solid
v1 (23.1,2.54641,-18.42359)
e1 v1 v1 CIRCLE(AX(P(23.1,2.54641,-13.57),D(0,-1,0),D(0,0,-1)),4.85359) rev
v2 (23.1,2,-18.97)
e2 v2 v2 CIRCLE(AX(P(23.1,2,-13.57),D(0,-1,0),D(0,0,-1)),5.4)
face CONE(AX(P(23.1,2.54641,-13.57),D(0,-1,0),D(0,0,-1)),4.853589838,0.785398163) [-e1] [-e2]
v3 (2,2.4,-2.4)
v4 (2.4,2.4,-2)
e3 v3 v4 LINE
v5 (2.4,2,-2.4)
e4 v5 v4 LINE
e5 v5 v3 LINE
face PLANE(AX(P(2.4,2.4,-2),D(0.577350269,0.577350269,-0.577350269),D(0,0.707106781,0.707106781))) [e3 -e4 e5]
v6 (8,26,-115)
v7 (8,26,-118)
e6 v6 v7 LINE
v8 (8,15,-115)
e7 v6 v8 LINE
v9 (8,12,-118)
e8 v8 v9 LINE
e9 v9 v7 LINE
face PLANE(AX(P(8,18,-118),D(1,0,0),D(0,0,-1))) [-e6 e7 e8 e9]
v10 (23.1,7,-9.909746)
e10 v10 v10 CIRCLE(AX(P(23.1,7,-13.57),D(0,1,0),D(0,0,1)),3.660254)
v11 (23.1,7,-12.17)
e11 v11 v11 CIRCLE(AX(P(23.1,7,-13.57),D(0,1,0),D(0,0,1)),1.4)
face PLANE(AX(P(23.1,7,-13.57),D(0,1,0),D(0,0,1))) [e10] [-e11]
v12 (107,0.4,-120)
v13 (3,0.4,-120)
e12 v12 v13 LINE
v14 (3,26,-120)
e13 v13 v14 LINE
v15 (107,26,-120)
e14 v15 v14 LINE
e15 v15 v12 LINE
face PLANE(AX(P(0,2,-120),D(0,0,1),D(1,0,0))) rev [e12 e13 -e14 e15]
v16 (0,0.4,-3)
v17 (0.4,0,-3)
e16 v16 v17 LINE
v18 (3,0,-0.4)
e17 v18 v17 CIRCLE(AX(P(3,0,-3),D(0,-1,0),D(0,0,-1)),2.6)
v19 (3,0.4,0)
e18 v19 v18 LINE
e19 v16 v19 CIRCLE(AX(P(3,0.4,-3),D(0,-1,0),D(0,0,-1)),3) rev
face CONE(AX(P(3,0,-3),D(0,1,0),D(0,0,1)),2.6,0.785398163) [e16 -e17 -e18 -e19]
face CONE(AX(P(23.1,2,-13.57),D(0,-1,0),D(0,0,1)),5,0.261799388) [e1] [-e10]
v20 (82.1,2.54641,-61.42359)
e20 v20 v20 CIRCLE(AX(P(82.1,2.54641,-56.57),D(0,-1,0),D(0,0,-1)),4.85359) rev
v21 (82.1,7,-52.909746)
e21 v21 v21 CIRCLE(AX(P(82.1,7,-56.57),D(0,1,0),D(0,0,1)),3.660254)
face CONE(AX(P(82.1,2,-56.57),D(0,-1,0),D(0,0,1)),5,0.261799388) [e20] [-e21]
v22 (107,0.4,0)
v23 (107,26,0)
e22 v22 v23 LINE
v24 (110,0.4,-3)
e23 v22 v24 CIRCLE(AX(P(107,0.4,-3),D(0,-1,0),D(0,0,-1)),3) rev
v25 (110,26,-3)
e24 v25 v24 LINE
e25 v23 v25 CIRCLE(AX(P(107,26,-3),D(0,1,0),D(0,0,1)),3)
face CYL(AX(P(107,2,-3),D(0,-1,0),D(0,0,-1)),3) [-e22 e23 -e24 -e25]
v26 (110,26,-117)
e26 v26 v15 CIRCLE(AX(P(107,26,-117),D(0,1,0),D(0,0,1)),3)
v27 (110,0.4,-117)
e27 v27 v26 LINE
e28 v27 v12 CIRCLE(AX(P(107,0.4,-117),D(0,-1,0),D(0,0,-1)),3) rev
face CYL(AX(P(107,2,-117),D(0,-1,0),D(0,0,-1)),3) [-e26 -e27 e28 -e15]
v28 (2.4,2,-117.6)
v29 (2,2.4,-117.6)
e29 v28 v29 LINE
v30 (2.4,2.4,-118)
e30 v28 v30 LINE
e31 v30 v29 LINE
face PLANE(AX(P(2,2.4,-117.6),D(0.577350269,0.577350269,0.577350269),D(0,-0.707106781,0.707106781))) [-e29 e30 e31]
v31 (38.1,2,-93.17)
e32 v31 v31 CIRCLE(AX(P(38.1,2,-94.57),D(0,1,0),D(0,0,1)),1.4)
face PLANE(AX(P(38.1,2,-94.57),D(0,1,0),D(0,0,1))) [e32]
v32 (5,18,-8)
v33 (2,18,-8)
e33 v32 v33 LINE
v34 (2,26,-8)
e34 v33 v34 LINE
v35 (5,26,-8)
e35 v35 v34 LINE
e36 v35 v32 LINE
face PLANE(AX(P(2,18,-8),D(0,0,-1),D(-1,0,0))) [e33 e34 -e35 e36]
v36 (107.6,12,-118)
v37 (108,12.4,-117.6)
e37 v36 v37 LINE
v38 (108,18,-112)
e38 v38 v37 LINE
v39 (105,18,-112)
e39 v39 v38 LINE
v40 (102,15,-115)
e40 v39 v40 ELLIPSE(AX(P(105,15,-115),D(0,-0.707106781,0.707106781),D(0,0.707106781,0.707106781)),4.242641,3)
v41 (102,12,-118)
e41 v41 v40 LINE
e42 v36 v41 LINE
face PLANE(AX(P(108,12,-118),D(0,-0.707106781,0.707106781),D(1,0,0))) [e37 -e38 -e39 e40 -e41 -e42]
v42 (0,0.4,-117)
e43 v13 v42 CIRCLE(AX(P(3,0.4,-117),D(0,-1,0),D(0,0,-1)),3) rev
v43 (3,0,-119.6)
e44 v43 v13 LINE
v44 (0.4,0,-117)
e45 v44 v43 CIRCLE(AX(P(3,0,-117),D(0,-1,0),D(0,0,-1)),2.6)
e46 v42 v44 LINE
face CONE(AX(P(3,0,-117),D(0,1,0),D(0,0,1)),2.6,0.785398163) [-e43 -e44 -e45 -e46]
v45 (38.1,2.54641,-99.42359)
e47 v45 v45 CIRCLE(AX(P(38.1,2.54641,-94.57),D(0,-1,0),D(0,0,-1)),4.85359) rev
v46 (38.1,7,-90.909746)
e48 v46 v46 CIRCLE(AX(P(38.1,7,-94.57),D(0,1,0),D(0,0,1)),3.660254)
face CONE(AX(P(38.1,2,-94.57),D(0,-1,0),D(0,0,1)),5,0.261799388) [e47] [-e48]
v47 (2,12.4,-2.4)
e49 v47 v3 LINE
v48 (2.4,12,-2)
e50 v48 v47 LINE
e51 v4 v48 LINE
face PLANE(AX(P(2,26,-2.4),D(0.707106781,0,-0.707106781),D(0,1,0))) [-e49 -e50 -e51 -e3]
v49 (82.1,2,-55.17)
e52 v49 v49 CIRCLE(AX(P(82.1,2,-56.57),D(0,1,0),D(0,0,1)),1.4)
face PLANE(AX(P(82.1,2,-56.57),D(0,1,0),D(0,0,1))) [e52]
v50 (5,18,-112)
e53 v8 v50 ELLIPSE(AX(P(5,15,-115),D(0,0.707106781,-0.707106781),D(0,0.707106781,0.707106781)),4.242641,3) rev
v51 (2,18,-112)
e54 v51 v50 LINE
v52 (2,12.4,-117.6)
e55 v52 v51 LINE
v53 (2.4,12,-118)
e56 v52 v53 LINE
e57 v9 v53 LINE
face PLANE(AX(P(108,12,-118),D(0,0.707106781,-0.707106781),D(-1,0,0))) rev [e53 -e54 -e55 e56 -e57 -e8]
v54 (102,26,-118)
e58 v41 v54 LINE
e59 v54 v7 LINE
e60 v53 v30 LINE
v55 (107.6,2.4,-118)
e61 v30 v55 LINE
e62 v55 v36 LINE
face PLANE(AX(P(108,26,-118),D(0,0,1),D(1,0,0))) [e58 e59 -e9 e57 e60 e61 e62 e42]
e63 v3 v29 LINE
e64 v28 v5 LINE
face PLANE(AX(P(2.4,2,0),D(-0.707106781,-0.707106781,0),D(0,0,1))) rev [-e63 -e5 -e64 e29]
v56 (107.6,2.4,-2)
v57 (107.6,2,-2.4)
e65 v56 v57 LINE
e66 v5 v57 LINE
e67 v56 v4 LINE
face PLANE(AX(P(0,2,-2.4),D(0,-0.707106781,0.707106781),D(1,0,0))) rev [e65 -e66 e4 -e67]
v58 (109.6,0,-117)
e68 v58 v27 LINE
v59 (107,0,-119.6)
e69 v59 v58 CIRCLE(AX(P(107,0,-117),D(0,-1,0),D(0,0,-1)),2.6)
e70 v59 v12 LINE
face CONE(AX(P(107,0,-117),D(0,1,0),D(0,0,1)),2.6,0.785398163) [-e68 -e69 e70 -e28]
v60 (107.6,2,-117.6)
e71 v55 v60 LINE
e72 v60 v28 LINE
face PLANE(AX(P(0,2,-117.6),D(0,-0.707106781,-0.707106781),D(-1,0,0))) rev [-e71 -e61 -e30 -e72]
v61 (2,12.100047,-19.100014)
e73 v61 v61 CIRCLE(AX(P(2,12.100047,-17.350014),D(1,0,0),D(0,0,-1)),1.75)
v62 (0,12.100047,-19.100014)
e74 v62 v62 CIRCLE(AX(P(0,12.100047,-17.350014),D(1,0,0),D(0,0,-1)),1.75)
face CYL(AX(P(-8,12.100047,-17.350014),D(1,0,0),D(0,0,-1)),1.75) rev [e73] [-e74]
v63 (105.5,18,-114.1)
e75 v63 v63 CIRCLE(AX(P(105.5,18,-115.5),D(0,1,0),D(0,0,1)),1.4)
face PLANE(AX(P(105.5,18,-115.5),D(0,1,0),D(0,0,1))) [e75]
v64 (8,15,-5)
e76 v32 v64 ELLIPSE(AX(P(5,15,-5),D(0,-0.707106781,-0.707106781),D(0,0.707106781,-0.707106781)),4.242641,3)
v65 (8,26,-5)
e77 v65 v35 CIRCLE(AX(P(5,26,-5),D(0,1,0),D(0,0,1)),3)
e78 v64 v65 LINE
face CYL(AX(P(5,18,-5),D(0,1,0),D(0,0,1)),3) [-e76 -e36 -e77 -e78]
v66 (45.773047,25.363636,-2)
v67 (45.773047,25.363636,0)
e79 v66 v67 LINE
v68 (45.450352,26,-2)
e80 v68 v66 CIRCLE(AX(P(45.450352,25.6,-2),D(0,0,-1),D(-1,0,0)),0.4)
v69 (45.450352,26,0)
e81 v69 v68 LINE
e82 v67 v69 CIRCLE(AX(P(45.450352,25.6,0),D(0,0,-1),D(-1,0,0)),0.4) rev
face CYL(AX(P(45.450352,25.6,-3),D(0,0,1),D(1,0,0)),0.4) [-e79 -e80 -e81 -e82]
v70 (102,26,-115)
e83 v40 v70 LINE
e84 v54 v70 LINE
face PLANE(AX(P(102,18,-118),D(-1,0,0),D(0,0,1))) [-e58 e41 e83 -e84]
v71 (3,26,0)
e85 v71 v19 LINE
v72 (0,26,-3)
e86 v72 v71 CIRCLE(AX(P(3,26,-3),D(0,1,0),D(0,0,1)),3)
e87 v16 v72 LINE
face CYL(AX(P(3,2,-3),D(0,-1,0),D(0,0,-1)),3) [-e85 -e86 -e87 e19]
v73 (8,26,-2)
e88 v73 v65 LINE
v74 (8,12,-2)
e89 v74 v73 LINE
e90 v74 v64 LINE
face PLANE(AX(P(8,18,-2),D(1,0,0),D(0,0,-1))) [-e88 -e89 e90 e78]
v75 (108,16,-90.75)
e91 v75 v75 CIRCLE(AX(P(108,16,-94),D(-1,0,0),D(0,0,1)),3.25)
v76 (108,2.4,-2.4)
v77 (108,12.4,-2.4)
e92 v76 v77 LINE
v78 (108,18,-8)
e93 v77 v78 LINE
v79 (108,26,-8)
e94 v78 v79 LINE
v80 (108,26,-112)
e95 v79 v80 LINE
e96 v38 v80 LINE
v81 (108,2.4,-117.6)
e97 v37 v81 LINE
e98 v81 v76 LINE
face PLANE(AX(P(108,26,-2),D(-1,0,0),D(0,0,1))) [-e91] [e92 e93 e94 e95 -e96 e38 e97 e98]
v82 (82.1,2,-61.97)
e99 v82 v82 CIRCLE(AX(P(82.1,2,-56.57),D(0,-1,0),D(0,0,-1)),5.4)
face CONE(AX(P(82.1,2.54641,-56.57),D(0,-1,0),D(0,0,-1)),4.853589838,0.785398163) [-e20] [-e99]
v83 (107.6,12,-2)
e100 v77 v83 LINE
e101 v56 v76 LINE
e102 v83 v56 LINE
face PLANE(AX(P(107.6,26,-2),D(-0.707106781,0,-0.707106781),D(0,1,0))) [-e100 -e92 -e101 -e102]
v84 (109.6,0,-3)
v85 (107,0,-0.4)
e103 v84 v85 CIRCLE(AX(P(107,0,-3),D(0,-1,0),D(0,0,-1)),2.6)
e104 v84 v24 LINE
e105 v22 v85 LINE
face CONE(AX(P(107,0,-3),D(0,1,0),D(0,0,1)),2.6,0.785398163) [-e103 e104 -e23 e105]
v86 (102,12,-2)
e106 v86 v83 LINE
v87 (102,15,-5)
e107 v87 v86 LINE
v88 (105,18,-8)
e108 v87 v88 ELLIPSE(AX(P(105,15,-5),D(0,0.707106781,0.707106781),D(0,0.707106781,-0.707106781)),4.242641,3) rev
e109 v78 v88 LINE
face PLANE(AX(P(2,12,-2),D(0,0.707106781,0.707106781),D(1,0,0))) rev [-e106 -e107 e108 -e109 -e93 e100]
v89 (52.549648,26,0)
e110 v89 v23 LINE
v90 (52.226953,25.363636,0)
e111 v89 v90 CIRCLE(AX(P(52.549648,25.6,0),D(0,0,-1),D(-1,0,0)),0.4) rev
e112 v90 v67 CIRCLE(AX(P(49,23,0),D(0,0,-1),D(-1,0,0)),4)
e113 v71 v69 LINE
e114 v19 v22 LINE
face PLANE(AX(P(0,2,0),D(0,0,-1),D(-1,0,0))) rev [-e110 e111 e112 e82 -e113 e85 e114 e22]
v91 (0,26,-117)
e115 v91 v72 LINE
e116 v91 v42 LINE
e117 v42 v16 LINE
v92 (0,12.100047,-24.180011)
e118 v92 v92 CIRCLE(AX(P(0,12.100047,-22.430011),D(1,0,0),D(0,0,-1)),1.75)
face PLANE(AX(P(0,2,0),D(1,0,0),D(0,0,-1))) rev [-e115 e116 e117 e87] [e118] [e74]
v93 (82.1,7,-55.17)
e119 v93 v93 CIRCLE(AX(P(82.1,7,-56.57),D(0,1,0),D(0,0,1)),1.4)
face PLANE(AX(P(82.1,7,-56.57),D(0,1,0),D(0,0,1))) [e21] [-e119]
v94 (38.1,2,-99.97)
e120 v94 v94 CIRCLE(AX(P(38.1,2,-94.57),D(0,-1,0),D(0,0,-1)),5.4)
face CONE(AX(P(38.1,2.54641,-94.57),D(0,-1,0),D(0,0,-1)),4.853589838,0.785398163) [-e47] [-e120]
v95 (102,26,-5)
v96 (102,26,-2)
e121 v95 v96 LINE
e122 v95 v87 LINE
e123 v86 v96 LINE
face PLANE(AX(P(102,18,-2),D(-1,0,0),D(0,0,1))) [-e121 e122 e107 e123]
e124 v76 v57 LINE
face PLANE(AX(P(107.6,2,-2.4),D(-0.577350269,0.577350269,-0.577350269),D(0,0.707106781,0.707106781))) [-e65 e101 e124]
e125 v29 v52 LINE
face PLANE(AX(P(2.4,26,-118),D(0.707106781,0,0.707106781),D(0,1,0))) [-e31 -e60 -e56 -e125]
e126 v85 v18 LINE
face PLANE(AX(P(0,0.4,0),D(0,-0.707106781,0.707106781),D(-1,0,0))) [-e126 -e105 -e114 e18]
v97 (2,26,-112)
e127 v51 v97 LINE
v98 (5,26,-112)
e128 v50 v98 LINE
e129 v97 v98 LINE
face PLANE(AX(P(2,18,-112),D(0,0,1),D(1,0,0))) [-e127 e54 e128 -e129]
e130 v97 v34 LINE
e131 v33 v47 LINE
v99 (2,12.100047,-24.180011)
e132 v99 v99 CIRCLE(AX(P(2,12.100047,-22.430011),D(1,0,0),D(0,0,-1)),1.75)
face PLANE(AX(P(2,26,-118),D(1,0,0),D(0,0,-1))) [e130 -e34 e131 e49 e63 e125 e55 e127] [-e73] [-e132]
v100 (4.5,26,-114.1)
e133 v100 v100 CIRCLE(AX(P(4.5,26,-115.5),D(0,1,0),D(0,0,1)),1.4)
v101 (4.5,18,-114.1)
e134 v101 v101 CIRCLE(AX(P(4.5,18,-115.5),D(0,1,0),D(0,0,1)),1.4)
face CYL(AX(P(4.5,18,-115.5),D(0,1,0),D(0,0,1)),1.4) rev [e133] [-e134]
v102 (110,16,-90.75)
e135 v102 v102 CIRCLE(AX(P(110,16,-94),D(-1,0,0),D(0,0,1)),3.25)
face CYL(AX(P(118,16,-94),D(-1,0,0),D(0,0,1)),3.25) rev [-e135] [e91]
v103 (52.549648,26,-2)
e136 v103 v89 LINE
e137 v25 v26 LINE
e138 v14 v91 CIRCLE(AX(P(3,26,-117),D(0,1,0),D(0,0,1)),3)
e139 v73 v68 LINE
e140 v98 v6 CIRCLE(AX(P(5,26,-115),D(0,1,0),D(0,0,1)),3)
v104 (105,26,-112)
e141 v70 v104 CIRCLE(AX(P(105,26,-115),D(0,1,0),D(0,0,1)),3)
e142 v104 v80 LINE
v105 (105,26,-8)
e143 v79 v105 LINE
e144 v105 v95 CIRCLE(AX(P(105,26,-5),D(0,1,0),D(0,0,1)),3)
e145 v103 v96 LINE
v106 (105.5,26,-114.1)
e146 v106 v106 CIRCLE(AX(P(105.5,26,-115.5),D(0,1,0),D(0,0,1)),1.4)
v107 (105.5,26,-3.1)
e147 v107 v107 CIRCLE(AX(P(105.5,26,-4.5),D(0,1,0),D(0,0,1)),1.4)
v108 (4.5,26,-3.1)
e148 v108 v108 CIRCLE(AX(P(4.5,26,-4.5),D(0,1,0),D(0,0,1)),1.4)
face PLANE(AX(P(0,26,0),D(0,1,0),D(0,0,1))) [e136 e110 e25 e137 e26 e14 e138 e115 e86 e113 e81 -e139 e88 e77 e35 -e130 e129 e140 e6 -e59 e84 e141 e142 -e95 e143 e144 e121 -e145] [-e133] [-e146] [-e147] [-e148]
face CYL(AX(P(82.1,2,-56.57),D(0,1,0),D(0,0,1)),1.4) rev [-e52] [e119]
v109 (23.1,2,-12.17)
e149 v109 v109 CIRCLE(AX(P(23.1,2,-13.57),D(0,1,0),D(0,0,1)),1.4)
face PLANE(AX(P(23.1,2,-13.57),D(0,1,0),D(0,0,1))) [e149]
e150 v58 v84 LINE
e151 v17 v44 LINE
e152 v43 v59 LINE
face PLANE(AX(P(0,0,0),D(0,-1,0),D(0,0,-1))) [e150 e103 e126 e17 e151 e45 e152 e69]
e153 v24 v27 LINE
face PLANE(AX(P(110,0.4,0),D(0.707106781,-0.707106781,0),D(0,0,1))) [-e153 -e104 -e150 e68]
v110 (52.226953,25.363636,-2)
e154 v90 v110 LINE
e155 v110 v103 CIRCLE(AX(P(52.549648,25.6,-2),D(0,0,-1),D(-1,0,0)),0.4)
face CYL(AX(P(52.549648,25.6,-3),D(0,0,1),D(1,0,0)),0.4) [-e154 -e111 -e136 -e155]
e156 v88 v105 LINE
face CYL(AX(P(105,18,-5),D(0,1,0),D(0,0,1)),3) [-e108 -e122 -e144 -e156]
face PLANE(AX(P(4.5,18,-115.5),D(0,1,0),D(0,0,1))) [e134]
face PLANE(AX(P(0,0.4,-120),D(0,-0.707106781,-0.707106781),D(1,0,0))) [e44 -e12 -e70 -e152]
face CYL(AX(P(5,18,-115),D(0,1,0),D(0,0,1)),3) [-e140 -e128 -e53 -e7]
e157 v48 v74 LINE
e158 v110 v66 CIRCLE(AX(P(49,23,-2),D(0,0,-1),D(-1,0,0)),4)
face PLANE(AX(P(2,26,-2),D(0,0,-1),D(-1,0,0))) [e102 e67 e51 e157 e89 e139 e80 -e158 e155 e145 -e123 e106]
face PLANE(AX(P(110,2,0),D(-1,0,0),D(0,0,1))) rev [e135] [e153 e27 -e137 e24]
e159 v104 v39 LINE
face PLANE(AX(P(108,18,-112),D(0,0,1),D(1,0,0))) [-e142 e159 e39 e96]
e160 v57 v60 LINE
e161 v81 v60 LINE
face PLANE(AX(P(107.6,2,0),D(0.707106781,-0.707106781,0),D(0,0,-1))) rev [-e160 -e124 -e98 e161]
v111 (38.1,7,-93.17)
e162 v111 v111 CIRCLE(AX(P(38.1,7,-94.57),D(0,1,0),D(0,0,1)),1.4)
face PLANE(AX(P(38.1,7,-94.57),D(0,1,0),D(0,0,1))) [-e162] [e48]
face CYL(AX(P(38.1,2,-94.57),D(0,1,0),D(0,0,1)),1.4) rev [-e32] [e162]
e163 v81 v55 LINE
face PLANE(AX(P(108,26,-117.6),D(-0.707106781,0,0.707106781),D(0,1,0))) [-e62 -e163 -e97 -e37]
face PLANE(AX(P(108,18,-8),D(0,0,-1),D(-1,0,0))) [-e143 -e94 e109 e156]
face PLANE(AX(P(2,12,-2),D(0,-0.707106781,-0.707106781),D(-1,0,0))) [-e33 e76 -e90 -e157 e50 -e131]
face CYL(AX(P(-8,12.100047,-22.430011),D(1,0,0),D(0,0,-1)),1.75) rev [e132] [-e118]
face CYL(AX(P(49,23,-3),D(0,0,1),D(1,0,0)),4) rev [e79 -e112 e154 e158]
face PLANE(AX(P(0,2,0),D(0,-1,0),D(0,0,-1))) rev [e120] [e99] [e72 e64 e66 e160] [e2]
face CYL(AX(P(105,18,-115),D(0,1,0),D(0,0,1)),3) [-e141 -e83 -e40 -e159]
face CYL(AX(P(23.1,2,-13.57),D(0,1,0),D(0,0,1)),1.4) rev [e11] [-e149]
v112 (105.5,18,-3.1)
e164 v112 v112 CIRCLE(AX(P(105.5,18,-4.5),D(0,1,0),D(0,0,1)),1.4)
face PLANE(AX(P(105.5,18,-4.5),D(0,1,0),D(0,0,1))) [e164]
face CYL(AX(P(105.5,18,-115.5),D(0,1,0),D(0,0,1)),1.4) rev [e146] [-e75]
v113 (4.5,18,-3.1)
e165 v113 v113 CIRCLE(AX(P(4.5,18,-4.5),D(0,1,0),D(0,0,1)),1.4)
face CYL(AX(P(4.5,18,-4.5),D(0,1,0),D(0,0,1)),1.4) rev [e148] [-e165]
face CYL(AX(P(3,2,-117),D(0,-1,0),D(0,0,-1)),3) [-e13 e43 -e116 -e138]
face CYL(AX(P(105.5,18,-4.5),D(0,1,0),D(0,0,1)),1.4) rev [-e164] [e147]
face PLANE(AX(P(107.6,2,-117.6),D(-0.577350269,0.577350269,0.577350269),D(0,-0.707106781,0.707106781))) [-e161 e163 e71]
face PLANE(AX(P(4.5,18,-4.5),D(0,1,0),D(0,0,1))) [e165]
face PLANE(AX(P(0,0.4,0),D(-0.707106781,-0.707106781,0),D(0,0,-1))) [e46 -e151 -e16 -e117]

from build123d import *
from OCP.BRepFilletAPI import BRepFilletAPI_MakeChamfer

# Parameters (mm, degrees)
SKETCH_1_W                = 110
SKETCH_1_H                = 120
EXTRUDE_1_DEPTH           = 2
SKETCH_2_R                = 5
EXTRUDE_2_DEPTH           = 5
EXTRUDE_2_DRAFT           = 15
EXTRUDE_2_PROFILE_2_DEPTH = 5
EXTRUDE_2_PROFILE_2_DRAFT = 15
EXTRUDE_2_PROFILE_3_DEPTH = 5
EXTRUDE_2_PROFILE_3_DRAFT = 15
SKETCH_3_R                = 1.4
CUT_EXTRUDE_1_DEPTH       = 5
SKETCH_4_W                = 110
SKETCH_4_H                = 120
SKETCH_4_W_2              = 106
SKETCH_4_H_2              = 116
EXTRUDE_3_DEPTH           = 24
SKETCH_5_W                = 6
SKETCH_5_H                = 6
EXTRUDE_4_DEPTH           = 8
CHAMFER_1_SIZE            = 6
SKETCH_6_R                = 1.4
CUT_EXTRUDE_2_DEPTH       = 8
FILLET_1_R                = 3
CHAMFER_2_SIZE            = 0.4
CHAMFER_3_SIZE            = 0.4
CHAMFER_3_SIZE2           = 0.565685425
SKETCH_8_R                = 4
CUT_EXTRUDE_3_DEPTH       = 3
FILLET_2_R                = 0.4
SKETCH_9_R                = 3.25
CUT_EXTRUDE_4_DEPTH       = 10
SKETCH_10_R               = 1.75
CUT_EXTRUDE_5_DEPTH       = 10


with BuildPart() as part:
    # 草图1 → 凸台-拉伸1 (new body)
    with BuildSketch(Plane(origin=(0, 0, 0), x_dir=(1, 0, 0), z_dir=(0, 1, 0))):
        with Locations((55, 60)):
            Rectangle(SKETCH_1_W, SKETCH_1_H)
    extrude(amount=EXTRUDE_1_DEPTH)


with BuildPart() as extrude_2_tool:
    # 草图2 → 凸台-拉伸2 (with draft: the straight prism first)
    with BuildSketch(Plane(origin=(0, 2, 0), x_dir=(1, 0, 0), z_dir=(0, 1, 0))):
        with Locations((82.1, 56.57)):
            Circle(SKETCH_2_R)
    extrude(amount=EXTRUDE_2_DEPTH)
    # 凸台-拉伸2: the draft: its side faces are tilted about the plane it starts from
    extrude_2_sides = [extrude_2_tool.faces().sort_by_distance(p)[0] for p in [
        (77.1, 4.5, -56.57),
    ]]
    draft(extrude_2_sides, Plane(origin=(0, 2, 0), x_dir=(1, 0, 0), z_dir=(0, 1, 0)), EXTRUDE_2_DRAFT)


with BuildPart() as part_1:
    add(part.part)

    # 凸台-拉伸2: add extrude_2_tool
    add(extrude_2_tool.part)


with BuildPart() as extrude_2_profile_2_tool:
    # 草图2 → 凸台-拉伸2 profile 2 (with draft: the straight prism first)
    with BuildSketch(Plane(origin=(0, 2, 0), x_dir=(1, 0, 0), z_dir=(0, 1, 0))):
        with Locations((38.1, 94.57)):
            Circle(SKETCH_2_R)
    extrude(amount=EXTRUDE_2_PROFILE_2_DEPTH)
    # 凸台-拉伸2 profile 2: the draft: its side faces are tilted about the plane it starts from
    extrude_2_profile_2_sides = [extrude_2_profile_2_tool.faces().sort_by_distance(p)[0] for p in [
        (33.1, 4.5, -94.57),
    ]]
    draft(extrude_2_profile_2_sides, Plane(origin=(0, 2, 0), x_dir=(1, 0, 0), z_dir=(0, 1, 0)), EXTRUDE_2_PROFILE_2_DRAFT)


with BuildPart() as part_2:
    add(part_1.part)

    # 凸台-拉伸2 profile 2: add extrude_2_profile_2_tool
    add(extrude_2_profile_2_tool.part)


with BuildPart() as extrude_2_profile_3_tool:
    # 草图2 → 凸台-拉伸2 profile 3 (with draft: the straight prism first)
    with BuildSketch(Plane(origin=(0, 2, 0), x_dir=(1, 0, 0), z_dir=(0, 1, 0))):
        with Locations((23.1, 13.57)):
            Circle(SKETCH_2_R)
    extrude(amount=EXTRUDE_2_PROFILE_3_DEPTH)
    # 凸台-拉伸2 profile 3: the draft: its side faces are tilted about the plane it starts from
    extrude_2_profile_3_sides = [extrude_2_profile_3_tool.faces().sort_by_distance(p)[0] for p in [
        (18.1, 4.5, -13.57),
    ]]
    draft(extrude_2_profile_3_sides, Plane(origin=(0, 2, 0), x_dir=(1, 0, 0), z_dir=(0, 1, 0)), EXTRUDE_2_PROFILE_3_DRAFT)


with BuildPart() as part_3:
    add(part_2.part)

    # 凸台-拉伸2 profile 3: add extrude_2_profile_3_tool
    add(extrude_2_profile_3_tool.part)

    # 草图3 → 切除-拉伸1 (cut)
    with BuildSketch(Plane(origin=(0, 7, 0), x_dir=(1, 0, 0), z_dir=(0, 1, 0))):
        with Locations(Location((82.1, 56.57, 0), (0, 0, 270))):
            Circle(SKETCH_3_R)
        with Locations(Location((38.1, 94.57, 0), (0, 0, 270))):
            Circle(SKETCH_3_R)
        with Locations(Location((23.1, 13.57, 0), (0, 0, 270))):
            Circle(SKETCH_3_R)
    extrude(amount=-CUT_EXTRUDE_1_DEPTH, mode=Mode.SUBTRACT)

    # 草图4 → 凸台-拉伸3 (add)
    with BuildSketch(Plane(origin=(0, 2, 0), x_dir=(1, 0, 0), z_dir=(0, 1, 0))):
        with Locations((55, 60)):
            Rectangle(SKETCH_4_W, SKETCH_4_H)
        with Locations((55, 60)):
            Rectangle(SKETCH_4_W_2, SKETCH_4_H_2, mode=Mode.SUBTRACT)
    extrude(amount=EXTRUDE_3_DEPTH)

    # 草图5 → 凸台-拉伸4 (add)
    with BuildSketch(Plane(origin=(0, 26, 0), x_dir=(1, 0, 0), z_dir=(0, 1, 0))):
        with Locations((5, 115)):
            Rectangle(SKETCH_5_W, SKETCH_5_H)
        with Locations((105, 115)):
            Rectangle(SKETCH_5_W, SKETCH_5_H)
        with Locations((105, 5)):
            Rectangle(SKETCH_5_W, SKETCH_5_H)
        with Locations((5, 5)):
            Rectangle(SKETCH_5_W, SKETCH_5_H)
    extrude(amount=-EXTRUDE_4_DEPTH)

    # 倒角1
    chamfer_1_edges = [part_3.edges().sort_by_distance(p)[0] for p in [
        (105, 18, -118),
        (5, 18, -118),
        (105, 18, -2),
        (5, 18, -2),
    ]]
    chamfer(chamfer_1_edges, length=CHAMFER_1_SIZE - 0.0001)  # a hair under: the kernel refuses the full size

    # 草图6 → 切除-拉伸2 (cut)
    with BuildSketch(Plane(origin=(0, 26, 0), x_dir=(1, 0, 0), z_dir=(0, 1, 0))):
        with Locations(Location((4.5, 115.5, 0), (0, 0, 270))):
            Circle(SKETCH_6_R)
        with Locations(Location((105.5, 115.5, 0), (0, 0, 270))):
            Circle(SKETCH_6_R)
        with Locations(Location((105.5, 4.5, 0), (0, 0, 270))):
            Circle(SKETCH_6_R)
        with Locations(Location((4.5, 4.5, 0), (0, 0, 270))):
            Circle(SKETCH_6_R)
    extrude(amount=-CUT_EXTRUDE_2_DEPTH, mode=Mode.SUBTRACT)

    # 圆角1
    fillet_1_edges = [part_3.edges().sort_by_distance(p)[0] for p in [
        (8, 22, -8),
        (8, 22, -112),
        (102, 22, -112),
        (0, 13, -120),
        (110, 13, -120),
        (110, 13, 0),
        (0, 13, 0),
        (102, 22, -8),
    ]]
    fillet(fillet_1_edges, radius=FILLET_1_R)

    # 倒角2
    chamfer_2_edges = [part_3.edges().sort_by_distance(p)[0] for p in [
        (55, 0, 0),
        (0, 0, -60),
        (55, 0, -120),
        (110, 0, -60),
        (0.878679656, 0, -119.121320344),
        (109.121320344, 0, -119.121320344),
        (109.121320344, 0, -0.878679656),
        (0.878679656, 0, -0.878679656),
    ]]
    chamfer(chamfer_2_edges, length=CHAMFER_2_SIZE)

    # 倒角3: one chamfer whose edges measure the first distance from different faces: ONE call of the kernel's chamfer builder (chamfer() names one face for all edges)
    chamfer_3_edges_1 = [part_3.edges().sort_by_distance(p)[0] for p in [
        (2, 7.00005, -118),
        (108, 7.00005, -118),
        (108, 7.00005, -2),
        (2, 7.00005, -2),
        (55, 2, -118),
        (2, 2, -60),
        (55, 2, -2),
        (108, 2, -60),
    ]]
    chamfer_3_edges_2 = [part_3.edges().sort_by_distance(p)[0] for p in [
        (77.1, 2, -56.57),
        (33.1, 2, -94.57),
        (18.1, 2, -13.57),
    ]]
    chamfer_3_side_2 = [part_3.faces().sort_by_distance(p)[0] for p in [
        (55.141315111, 2, -60.099571799),
    ]]
    chamfer_3 = BRepFilletAPI_MakeChamfer(part_3.part.solid().wrapped)
    for e in chamfer_3_edges_1:
        chamfer_3.Add(CHAMFER_3_SIZE, e.wrapped)
    for e in chamfer_3_edges_2:
        chamfer_3.Add(CHAMFER_3_SIZE, CHAMFER_3_SIZE2, e.wrapped, chamfer_3_side_2[0].wrapped)  # the first distance lies on this face
    add(Compound.cast(chamfer_3.Shape()), mode=Mode.REPLACE)

    # 草图8 → 切除-拉伸3 (cut)
    with BuildSketch(Plane.XY):
        with Locations((49, 23)):
            Circle(SKETCH_8_R)
    extrude(amount=-CUT_EXTRUDE_3_DEPTH, mode=Mode.SUBTRACT)

    # 圆角2
    fillet_2_edges = [part_3.edges().sort_by_distance(p)[0] for p in [
        (46.354248689, 26, -1),
        (51.645751311, 26, -1),
    ]]
    fillet(fillet_2_edges, radius=FILLET_2_R)

    # 草图9 → 切除-拉伸4 (cut)
    with BuildSketch(Plane.ZY.offset(-108)):
        with Locations((-94, 16)):
            Circle(SKETCH_9_R)
    extrude(amount=-CUT_EXTRUDE_4_DEPTH, mode=Mode.SUBTRACT)

    # 草图10 → 切除-拉伸5 (cut)
    with BuildSketch(Plane(origin=(2, 0, 0), x_dir=(0, 0, -1), z_dir=(1, 0, 0))):
        with Locations((22.430011451, 12.100047346)):
            Circle(SKETCH_10_R)
        with Locations((17.350013958, 12.100047346)):
            Circle(SKETCH_10_R)
    extrude(amount=-CUT_EXTRUDE_5_DEPTH, mode=Mode.SUBTRACT)


solid = part_3.part
